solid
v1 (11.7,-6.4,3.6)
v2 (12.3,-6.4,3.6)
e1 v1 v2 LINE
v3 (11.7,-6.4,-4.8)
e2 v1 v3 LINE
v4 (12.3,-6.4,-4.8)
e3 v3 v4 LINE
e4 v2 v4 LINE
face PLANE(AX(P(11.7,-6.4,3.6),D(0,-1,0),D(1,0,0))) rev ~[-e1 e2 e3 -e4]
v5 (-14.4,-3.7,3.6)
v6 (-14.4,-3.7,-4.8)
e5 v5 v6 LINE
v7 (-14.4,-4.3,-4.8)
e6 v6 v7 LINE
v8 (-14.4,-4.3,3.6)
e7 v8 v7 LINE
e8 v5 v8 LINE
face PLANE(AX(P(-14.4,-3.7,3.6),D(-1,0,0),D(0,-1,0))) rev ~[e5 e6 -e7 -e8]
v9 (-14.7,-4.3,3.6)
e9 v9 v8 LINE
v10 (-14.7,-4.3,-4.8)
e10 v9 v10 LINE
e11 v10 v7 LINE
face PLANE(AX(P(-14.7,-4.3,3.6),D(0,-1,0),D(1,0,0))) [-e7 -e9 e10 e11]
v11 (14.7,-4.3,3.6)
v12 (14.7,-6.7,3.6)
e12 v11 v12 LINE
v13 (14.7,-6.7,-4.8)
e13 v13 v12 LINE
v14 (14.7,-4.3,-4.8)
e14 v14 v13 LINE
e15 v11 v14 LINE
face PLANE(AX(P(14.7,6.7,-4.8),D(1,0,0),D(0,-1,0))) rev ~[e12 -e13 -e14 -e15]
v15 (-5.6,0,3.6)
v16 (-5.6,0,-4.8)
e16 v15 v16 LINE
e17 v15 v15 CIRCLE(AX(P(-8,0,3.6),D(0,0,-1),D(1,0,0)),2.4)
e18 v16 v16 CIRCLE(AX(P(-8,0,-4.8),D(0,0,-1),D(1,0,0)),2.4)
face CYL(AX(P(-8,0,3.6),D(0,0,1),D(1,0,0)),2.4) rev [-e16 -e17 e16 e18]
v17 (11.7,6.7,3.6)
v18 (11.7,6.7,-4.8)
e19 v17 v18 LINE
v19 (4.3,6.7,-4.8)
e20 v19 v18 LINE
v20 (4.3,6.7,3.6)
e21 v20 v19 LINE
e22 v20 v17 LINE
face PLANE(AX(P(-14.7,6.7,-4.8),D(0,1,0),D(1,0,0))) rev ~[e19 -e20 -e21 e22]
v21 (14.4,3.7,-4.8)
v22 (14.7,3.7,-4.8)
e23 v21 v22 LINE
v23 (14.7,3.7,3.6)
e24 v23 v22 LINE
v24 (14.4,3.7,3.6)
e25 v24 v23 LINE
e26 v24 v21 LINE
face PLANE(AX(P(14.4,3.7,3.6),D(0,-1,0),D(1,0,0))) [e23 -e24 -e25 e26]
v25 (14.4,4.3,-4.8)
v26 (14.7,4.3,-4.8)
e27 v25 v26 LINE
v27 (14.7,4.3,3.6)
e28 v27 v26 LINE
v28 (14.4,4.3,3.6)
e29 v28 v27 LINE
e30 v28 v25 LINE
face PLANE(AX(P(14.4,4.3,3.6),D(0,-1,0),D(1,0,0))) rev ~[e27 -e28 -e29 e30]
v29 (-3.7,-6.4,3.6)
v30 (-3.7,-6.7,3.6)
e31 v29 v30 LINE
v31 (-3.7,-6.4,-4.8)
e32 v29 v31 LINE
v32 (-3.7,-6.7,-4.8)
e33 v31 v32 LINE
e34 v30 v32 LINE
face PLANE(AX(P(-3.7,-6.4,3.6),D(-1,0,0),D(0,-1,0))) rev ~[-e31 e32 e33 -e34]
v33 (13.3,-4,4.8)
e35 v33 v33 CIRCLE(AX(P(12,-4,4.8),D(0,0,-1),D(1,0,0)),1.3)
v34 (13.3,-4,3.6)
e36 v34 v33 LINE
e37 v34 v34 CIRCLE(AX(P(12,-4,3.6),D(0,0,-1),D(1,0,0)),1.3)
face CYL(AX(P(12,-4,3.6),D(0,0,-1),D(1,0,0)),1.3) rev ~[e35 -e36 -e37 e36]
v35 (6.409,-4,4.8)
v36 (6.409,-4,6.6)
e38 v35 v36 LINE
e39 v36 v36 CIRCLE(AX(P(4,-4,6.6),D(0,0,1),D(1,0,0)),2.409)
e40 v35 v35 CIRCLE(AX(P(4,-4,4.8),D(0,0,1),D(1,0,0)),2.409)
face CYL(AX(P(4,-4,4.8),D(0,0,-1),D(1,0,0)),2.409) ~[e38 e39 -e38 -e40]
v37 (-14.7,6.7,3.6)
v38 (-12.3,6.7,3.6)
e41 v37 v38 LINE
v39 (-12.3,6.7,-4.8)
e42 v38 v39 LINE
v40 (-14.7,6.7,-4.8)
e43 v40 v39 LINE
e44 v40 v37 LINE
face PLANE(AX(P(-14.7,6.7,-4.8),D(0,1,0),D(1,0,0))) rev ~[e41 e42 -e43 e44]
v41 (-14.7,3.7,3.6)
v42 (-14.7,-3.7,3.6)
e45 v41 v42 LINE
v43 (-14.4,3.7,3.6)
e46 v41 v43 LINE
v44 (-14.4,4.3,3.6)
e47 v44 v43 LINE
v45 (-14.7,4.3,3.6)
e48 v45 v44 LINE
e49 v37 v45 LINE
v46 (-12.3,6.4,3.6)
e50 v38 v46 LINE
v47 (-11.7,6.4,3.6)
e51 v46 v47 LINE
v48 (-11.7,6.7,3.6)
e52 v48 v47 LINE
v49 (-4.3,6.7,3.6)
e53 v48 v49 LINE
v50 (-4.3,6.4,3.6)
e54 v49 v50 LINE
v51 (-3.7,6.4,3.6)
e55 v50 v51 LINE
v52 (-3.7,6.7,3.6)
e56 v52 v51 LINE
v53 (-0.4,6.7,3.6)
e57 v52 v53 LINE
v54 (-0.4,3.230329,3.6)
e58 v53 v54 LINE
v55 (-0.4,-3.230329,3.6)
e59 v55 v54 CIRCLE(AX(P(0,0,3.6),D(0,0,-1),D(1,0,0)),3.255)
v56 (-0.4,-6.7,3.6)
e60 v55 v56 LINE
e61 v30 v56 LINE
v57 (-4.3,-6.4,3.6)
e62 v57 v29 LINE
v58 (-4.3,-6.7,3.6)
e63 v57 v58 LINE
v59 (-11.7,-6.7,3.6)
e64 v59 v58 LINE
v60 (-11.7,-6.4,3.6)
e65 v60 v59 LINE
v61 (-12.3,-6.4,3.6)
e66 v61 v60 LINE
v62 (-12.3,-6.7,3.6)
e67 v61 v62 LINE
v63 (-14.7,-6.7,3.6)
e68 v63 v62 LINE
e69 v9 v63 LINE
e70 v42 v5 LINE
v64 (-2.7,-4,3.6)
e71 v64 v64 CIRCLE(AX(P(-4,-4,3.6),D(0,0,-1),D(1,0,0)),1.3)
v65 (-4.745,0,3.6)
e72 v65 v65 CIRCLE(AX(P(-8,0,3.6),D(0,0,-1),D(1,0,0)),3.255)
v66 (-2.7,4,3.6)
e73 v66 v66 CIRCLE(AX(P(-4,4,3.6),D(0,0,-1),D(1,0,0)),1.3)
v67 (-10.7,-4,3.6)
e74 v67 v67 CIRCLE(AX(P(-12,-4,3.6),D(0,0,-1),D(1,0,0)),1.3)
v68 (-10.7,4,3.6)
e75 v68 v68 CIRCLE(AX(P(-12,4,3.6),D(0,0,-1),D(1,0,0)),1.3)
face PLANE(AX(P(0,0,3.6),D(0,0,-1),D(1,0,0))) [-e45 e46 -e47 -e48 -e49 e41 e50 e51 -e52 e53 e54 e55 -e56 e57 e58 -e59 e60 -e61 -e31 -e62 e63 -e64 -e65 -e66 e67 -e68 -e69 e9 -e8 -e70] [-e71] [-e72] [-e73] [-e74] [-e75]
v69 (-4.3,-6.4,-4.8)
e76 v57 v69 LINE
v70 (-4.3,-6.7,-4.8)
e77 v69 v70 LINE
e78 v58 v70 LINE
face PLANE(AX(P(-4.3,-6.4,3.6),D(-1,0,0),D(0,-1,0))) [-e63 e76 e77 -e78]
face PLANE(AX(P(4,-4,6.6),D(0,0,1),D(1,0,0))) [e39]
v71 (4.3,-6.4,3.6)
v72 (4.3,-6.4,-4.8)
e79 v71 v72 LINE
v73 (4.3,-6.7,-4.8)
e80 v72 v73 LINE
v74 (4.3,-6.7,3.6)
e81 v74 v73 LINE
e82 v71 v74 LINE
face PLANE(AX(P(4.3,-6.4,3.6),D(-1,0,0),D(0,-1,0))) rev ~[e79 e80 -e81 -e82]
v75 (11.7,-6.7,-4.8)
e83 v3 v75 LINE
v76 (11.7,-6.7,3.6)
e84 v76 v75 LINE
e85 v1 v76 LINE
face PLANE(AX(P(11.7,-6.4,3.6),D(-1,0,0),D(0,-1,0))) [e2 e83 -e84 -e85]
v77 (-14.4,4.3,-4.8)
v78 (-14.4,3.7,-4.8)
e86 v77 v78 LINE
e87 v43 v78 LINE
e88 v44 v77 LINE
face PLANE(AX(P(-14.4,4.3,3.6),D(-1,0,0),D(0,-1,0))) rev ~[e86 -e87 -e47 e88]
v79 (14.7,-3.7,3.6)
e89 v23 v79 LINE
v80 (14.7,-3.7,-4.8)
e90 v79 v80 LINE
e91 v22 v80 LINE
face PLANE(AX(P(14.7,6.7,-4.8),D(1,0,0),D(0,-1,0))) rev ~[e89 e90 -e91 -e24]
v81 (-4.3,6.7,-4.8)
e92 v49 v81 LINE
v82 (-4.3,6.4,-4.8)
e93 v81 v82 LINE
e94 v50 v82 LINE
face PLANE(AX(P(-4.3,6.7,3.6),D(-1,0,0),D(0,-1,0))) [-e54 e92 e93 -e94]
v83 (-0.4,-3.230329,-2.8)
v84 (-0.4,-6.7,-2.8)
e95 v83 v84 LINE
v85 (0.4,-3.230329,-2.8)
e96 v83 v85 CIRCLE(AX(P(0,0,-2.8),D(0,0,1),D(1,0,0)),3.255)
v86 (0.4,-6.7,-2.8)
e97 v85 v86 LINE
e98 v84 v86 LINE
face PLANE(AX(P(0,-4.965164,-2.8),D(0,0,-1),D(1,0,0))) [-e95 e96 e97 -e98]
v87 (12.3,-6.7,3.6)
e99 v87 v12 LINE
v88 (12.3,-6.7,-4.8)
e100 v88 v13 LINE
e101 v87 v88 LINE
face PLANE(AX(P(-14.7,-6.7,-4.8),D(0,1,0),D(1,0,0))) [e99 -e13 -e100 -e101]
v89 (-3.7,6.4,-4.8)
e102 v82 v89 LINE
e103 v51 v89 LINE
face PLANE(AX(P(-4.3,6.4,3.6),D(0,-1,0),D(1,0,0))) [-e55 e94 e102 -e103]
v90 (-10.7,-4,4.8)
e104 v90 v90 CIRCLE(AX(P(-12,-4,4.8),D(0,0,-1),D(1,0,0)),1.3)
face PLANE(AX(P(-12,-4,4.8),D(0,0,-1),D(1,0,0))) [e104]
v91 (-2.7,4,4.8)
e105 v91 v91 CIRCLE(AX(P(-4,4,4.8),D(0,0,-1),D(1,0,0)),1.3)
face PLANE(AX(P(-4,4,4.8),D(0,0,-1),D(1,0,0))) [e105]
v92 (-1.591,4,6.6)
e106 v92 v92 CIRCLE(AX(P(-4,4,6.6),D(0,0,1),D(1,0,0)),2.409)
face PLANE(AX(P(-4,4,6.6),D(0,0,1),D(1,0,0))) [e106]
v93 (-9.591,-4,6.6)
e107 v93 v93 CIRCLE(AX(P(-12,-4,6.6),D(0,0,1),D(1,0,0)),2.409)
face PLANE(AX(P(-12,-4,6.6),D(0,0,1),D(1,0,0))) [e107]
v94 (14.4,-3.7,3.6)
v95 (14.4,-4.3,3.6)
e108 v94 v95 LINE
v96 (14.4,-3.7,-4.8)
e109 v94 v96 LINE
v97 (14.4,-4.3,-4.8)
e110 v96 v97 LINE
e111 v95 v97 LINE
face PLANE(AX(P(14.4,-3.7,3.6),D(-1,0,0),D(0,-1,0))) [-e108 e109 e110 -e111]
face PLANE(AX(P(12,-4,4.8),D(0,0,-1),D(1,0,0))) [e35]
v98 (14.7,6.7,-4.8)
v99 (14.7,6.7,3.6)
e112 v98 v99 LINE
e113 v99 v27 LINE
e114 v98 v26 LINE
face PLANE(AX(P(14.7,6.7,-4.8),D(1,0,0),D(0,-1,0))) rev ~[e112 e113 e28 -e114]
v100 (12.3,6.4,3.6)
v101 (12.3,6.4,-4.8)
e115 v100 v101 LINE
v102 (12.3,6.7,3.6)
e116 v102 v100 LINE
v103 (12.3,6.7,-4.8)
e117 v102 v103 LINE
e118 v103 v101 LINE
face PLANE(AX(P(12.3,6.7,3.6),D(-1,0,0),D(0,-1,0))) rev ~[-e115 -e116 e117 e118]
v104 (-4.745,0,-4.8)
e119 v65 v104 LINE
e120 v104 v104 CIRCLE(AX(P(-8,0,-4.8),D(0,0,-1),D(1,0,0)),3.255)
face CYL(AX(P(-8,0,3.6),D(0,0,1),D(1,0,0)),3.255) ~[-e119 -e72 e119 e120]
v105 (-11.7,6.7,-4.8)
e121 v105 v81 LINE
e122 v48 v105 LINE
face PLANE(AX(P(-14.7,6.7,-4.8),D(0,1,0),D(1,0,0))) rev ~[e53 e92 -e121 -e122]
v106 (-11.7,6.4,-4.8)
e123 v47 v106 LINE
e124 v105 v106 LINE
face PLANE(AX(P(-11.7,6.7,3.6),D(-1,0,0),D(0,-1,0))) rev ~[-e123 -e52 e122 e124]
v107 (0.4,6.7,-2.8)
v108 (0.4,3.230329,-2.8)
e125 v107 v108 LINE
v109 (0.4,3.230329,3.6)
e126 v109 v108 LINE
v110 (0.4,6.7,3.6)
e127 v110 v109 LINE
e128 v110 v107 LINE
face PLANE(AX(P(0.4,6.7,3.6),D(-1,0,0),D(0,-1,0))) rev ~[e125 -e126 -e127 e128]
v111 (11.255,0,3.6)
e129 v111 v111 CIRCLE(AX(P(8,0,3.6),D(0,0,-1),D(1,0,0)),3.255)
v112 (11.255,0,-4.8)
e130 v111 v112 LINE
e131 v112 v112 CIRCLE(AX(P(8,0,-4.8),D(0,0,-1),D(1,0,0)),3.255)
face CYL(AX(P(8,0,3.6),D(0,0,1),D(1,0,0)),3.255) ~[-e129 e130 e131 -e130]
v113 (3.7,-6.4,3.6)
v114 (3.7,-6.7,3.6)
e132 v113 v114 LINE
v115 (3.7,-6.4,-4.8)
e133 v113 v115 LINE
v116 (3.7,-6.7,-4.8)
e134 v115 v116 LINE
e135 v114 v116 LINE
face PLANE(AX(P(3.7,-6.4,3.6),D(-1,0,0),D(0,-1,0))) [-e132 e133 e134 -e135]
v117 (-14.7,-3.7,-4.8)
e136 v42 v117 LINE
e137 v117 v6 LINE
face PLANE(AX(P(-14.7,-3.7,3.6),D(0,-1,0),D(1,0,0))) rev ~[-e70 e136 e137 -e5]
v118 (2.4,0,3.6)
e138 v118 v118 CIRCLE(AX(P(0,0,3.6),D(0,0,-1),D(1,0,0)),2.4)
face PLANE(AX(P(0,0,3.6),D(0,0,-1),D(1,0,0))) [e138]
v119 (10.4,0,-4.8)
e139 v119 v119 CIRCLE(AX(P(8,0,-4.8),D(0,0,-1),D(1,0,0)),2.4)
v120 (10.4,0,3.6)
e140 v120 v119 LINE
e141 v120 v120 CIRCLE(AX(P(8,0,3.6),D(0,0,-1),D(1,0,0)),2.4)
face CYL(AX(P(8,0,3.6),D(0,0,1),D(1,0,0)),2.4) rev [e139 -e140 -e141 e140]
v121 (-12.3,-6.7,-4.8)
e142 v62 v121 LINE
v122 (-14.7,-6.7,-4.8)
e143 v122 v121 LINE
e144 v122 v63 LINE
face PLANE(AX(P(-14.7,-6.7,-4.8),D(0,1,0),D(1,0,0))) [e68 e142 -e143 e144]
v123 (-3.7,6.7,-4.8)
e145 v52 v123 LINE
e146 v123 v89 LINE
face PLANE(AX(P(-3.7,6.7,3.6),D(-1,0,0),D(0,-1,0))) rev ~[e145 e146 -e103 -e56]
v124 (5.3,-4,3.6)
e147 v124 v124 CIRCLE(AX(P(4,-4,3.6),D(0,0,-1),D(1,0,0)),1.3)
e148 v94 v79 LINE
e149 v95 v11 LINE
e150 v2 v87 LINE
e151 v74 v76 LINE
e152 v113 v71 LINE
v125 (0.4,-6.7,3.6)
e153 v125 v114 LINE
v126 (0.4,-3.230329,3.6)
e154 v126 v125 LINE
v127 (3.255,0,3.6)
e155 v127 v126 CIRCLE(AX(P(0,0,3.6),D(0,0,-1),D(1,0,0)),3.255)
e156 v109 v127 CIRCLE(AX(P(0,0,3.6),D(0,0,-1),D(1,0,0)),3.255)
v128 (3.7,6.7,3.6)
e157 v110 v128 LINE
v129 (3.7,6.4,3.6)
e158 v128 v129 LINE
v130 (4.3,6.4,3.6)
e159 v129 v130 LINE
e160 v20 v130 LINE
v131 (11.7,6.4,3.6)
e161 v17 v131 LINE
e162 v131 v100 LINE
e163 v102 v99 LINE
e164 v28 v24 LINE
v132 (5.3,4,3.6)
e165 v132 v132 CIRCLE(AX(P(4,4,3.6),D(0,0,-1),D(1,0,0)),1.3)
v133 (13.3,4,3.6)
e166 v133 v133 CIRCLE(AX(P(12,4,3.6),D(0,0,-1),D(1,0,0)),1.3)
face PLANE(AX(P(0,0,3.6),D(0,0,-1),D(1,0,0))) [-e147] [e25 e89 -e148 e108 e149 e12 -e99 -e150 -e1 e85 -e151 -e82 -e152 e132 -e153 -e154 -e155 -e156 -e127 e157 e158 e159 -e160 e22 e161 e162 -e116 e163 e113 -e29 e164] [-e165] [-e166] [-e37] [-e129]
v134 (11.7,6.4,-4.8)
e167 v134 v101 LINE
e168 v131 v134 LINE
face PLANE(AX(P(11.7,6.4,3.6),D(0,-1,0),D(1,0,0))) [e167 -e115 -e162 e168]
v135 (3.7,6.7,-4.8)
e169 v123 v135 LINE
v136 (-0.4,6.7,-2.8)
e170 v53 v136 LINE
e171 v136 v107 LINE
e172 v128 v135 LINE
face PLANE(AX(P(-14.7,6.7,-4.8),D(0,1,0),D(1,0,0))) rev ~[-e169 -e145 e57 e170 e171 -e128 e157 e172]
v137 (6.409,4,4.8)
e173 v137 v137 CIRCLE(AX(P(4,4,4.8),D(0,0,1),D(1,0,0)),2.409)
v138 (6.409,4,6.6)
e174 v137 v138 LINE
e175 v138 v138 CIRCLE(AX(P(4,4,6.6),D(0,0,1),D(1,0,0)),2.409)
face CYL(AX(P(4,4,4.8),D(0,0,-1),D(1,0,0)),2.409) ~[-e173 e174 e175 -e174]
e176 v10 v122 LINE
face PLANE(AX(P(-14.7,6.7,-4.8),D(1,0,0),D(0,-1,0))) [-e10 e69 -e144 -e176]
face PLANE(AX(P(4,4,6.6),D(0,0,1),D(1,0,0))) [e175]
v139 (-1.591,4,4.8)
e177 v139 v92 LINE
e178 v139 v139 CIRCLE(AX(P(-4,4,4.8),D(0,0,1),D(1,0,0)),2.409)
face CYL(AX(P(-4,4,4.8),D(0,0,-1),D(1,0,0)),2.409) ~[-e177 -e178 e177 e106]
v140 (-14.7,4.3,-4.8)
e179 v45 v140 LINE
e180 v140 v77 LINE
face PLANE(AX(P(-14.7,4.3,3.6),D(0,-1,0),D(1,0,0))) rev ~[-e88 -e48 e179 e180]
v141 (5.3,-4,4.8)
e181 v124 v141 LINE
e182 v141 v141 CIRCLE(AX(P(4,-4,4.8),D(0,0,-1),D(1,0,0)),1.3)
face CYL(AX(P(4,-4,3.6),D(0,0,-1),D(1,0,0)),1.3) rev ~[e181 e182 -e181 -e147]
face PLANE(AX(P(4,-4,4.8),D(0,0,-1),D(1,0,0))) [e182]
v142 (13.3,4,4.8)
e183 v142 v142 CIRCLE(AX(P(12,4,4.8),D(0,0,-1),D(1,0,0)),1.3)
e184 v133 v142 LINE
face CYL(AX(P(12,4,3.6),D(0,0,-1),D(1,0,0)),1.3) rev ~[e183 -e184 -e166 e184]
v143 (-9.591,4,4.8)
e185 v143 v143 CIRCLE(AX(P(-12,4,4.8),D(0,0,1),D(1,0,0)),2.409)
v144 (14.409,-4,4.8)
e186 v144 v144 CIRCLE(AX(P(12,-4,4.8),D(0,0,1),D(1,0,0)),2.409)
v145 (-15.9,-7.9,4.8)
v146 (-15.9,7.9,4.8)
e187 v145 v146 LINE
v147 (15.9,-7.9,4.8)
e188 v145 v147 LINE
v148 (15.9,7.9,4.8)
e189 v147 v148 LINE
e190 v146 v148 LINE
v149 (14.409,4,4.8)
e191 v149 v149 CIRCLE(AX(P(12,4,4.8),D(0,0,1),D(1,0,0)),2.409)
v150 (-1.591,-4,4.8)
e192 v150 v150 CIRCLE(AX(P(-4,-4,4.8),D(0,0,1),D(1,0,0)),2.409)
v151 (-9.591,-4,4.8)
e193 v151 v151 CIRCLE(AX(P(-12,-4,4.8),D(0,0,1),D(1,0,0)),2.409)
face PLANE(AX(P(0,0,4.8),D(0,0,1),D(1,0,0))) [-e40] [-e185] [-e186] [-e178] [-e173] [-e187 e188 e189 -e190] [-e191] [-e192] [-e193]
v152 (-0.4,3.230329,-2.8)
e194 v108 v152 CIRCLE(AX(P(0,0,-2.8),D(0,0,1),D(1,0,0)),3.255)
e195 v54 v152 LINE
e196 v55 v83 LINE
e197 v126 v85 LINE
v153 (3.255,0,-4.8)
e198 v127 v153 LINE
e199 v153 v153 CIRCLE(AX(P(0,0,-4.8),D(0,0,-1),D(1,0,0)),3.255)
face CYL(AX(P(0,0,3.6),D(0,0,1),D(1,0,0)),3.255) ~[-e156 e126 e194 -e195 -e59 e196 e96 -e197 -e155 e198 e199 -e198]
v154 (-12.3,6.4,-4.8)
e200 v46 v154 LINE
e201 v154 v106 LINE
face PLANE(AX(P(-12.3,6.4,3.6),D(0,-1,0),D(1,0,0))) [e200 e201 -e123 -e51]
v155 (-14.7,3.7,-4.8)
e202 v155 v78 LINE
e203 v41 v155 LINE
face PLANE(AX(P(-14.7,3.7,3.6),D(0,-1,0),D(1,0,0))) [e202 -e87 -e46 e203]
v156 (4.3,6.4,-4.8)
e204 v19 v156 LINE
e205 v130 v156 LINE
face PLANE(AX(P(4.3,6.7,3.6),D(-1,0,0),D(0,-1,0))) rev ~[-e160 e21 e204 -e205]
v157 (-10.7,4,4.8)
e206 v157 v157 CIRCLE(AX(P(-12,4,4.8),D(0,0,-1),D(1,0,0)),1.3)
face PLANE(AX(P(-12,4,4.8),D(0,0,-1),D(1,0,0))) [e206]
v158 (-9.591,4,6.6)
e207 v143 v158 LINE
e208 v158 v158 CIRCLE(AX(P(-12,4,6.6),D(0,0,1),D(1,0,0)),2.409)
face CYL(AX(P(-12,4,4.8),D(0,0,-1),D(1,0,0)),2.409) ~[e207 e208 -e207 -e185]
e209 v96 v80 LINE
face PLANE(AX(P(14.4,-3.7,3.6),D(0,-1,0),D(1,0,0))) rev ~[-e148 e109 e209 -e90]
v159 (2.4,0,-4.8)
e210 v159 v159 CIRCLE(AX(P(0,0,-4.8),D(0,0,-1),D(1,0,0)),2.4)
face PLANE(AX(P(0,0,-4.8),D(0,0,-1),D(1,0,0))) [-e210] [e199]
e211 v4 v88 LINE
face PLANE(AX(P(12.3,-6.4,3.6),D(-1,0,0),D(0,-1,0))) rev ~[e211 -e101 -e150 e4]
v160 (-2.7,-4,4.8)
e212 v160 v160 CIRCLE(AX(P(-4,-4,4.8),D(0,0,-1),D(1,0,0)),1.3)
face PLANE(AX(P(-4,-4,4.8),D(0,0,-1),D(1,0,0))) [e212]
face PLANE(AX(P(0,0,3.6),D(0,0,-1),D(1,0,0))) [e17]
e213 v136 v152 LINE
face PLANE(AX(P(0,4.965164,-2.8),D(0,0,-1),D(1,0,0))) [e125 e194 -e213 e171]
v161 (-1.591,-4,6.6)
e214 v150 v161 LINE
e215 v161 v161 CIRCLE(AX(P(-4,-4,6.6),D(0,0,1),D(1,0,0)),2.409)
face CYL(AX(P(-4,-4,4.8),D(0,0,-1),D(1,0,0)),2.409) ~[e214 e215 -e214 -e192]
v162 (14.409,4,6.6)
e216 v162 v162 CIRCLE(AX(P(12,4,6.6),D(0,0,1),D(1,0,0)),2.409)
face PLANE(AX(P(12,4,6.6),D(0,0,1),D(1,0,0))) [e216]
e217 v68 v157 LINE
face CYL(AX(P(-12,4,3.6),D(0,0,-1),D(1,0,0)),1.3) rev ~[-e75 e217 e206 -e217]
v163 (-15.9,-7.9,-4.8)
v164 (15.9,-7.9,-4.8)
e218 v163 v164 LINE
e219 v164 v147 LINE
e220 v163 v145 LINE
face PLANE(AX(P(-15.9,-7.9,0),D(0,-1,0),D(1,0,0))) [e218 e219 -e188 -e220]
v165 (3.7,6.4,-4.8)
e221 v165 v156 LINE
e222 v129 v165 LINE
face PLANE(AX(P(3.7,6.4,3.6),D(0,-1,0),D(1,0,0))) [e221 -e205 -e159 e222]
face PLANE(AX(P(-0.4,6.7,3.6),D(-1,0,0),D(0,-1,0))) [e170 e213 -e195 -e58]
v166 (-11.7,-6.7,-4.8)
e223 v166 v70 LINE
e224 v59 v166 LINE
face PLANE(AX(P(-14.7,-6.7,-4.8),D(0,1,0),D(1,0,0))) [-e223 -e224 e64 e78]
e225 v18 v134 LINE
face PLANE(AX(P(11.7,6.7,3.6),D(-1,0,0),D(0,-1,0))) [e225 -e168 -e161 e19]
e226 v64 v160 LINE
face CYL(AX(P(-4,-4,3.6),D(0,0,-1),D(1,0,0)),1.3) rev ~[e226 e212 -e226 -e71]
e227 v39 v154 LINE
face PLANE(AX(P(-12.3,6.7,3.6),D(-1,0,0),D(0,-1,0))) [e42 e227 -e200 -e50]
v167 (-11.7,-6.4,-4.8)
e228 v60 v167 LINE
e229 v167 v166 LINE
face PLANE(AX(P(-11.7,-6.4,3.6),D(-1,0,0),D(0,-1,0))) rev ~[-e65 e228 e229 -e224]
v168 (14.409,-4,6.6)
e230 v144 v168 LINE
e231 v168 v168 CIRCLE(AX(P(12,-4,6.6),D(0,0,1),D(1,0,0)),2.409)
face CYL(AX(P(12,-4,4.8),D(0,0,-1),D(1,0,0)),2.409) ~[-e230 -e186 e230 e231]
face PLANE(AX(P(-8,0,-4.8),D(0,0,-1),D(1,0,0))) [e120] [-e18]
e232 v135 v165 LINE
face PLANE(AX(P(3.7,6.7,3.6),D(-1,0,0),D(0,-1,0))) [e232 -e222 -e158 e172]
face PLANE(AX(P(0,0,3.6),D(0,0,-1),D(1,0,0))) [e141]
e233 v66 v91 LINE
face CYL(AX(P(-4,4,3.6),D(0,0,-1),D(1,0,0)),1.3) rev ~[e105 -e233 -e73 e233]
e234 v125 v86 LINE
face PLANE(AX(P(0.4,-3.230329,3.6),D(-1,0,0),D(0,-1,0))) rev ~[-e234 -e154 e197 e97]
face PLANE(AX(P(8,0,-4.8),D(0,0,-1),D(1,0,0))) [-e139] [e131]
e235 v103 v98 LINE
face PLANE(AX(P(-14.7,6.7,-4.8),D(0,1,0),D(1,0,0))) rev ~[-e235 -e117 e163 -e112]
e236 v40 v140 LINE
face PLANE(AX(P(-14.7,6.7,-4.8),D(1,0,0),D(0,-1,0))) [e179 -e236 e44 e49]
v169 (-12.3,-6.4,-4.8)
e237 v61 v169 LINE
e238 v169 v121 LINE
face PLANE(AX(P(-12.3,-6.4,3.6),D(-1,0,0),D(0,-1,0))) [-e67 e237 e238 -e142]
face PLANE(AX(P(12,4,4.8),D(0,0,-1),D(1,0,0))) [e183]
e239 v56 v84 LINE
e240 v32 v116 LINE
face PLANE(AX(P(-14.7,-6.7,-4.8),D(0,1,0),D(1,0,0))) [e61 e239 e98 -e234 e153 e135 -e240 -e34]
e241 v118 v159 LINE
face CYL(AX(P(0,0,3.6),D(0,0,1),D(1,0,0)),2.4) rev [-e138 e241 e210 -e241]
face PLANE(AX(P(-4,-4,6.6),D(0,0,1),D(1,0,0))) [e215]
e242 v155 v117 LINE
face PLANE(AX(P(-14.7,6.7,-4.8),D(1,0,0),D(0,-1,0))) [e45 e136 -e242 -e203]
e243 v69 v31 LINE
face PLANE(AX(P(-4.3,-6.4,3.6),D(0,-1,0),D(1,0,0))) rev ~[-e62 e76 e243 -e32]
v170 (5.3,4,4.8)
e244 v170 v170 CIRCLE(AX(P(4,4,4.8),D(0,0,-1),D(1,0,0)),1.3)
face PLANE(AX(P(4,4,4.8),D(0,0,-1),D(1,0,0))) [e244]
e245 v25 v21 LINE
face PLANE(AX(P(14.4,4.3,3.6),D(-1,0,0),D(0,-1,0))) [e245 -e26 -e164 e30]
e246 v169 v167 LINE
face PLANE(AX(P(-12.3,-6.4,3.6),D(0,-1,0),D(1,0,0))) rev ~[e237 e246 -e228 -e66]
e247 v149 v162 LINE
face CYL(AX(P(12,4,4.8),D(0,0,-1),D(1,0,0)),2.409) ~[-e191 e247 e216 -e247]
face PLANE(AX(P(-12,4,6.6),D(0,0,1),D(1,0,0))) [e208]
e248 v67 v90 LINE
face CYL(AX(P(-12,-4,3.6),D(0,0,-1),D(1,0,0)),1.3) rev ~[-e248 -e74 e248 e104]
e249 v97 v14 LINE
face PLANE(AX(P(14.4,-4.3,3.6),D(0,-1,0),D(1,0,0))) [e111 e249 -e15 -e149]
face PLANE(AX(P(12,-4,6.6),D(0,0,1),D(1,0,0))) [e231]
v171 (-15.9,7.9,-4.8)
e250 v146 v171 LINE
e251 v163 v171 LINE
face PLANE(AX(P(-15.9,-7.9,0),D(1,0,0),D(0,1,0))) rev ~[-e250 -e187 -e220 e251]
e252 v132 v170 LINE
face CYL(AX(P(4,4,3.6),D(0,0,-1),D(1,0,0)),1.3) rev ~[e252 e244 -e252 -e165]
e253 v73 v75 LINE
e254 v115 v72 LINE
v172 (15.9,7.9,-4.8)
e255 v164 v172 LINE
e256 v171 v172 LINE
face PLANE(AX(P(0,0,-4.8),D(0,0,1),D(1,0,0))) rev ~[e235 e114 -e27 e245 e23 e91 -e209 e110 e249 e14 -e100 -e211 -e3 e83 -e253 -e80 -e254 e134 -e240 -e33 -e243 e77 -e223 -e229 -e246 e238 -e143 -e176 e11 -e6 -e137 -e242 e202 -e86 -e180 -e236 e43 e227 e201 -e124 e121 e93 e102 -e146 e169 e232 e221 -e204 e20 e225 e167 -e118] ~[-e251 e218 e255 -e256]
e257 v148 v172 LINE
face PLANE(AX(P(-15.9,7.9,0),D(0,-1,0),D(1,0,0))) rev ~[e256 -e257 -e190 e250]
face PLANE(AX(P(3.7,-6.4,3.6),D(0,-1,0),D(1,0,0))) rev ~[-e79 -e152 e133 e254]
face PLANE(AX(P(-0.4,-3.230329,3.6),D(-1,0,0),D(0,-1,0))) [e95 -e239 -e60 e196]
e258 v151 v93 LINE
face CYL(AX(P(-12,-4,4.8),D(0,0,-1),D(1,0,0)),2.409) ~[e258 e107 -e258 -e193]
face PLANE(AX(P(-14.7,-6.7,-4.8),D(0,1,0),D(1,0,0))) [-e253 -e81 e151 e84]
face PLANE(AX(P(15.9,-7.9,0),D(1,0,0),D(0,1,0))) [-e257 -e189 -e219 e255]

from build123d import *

# Parameters (mm, degrees)
F0_W      = 31.8
F0_H      = 15.8
F1_DEPTH  = 4.8
F2_W      = 29.4
F2_H      = 13.4
F3_DEPTH  = 8.4
F4_R      = 2.409
F5_DEPTH  = 1.8
F6_R      = 1.3
F7_DEPTH  = 1.2
F8_R      = 3.255
F8_R_2    = 2.4
F9_DEPTH  = 8.4
F10_W     = 0.3
F10_H     = 0.6
F11_DEPTH = 8.4
F12_W     = 0.6
F12_H     = 0.3
F13_DEPTH = 8.4
F14_W     = 0.8
F14_H     = 3.4696710694
F15_DEPTH = 6.4


with BuildPart() as f1:
    # F0 (on Top) → F1 (new body, symmetric)
    with BuildSketch(Plane.XY):
        Rectangle(F0_W, F0_H)
    extrude(amount=F1_DEPTH, both=True)

    # F2 (on face) → F3 (cut)
    with BuildSketch(Plane(origin=(0, 0, -4.8), x_dir=(1, 0, 0), z_dir=(0, 0, -1))):
        Rectangle(F2_W, F2_H)
    extrude(amount=-F3_DEPTH, mode=Mode.SUBTRACT)

    # F4 (on face) → F5 (join)
    with BuildSketch(Plane.XY.offset(4.8)):
        with Locations((-12, 4)):
            Circle(F4_R)
        with Locations((-4, 4)):
            Circle(F4_R)
        with Locations((-4, -4)):
            Circle(F4_R)
        with Locations((-12, -4)):
            Circle(F4_R)
        with Locations((4, -4)):
            Circle(F4_R)
        with Locations((12, -4)):
            Circle(F4_R)
        with Locations((4, 4)):
            Circle(F4_R)
        with Locations((12, 4)):
            Circle(F4_R)
    extrude(amount=F5_DEPTH)

    # F6 (on face) → F7 (cut)
    with BuildSketch(Plane(origin=(0, 0, 3.6), x_dir=(1, 0, 0), z_dir=(0, 0, -1))):
        with Locations((-12, 4)):
            Circle(F6_R)
        with Locations((-4, 4)):
            Circle(F6_R)
        with Locations((-4, -4)):
            Circle(F6_R)
        with Locations((-12, -4)):
            Circle(F6_R)
        with Locations((4, -4)):
            Circle(F6_R)
        with Locations((12, -4)):
            Circle(F6_R)
        with Locations((4, 4)):
            Circle(F6_R)
        with Locations((12, 4)):
            Circle(F6_R)
    extrude(amount=-F7_DEPTH, mode=Mode.SUBTRACT)

    # F8 (on face) → F9 (join, through all)
    with BuildSketch(Plane(origin=(0, 0, 3.6), x_dir=(1, 0, 0), z_dir=(0, 0, -1))):
        with Locations((-8, 0)):
            Circle(F8_R)
        with Locations((-8, 0)):
            Circle(F8_R_2, mode=Mode.SUBTRACT)
        Circle(F8_R)
        Circle(F8_R_2, mode=Mode.SUBTRACT)
        with Locations((8, 0)):
            Circle(F8_R)
        with Locations((8, 0)):
            Circle(F8_R_2, mode=Mode.SUBTRACT)
    extrude(amount=F9_DEPTH)

    # F10 (on face) → F11 (join, through all)
    with BuildSketch(Plane(origin=(0, 0, 3.6), x_dir=(1, 0, 0), z_dir=(0, 0, -1))):
        with Locations((-14.55, 4)):
            Rectangle(F10_W, F10_H)
        with Locations((-14.55, -4)):
            Rectangle(F10_W, F10_H)
        with Locations((14.55, 4)):
            Rectangle(F10_W, F10_H)
        with Locations((14.55, -4)):
            Rectangle(F10_W, F10_H)
    extrude(amount=F11_DEPTH)

    # F12 (on face) → F13 (join, through all)
    with BuildSketch(Plane(origin=(0, 0, 3.6), x_dir=(1, 0, 0), z_dir=(0, 0, -1))):
        with Locations((-12, 6.55)):
            Rectangle(F12_W, F12_H)
        with Locations((-12, -6.55)):
            Rectangle(F12_W, F12_H)
        with Locations((-4, 6.55)):
            Rectangle(F12_W, F12_H)
        with Locations((-4, -6.55)):
            Rectangle(F12_W, F12_H)
        with Locations((4, 6.55)):
            Rectangle(F12_W, F12_H)
        with Locations((12, 6.55)):
            Rectangle(F12_W, F12_H)
        with Locations((12, -6.55)):
            Rectangle(F12_W, F12_H)
        with Locations((4, -6.55)):
            Rectangle(F12_W, F12_H)
    extrude(amount=F13_DEPTH)

    # F14 (on face) → F15 (join)
    with BuildSketch(Plane(origin=(0, 0, 3.6), x_dir=(1, 0, 0), z_dir=(0, 0, -1))):
        with Locations((0, 4.9651644653)):
            Rectangle(F14_W, F14_H)
        with Locations((0, -4.9651644653)):
            Rectangle(F14_W, F14_H)
    extrude(amount=F15_DEPTH)


solid = f1.part
